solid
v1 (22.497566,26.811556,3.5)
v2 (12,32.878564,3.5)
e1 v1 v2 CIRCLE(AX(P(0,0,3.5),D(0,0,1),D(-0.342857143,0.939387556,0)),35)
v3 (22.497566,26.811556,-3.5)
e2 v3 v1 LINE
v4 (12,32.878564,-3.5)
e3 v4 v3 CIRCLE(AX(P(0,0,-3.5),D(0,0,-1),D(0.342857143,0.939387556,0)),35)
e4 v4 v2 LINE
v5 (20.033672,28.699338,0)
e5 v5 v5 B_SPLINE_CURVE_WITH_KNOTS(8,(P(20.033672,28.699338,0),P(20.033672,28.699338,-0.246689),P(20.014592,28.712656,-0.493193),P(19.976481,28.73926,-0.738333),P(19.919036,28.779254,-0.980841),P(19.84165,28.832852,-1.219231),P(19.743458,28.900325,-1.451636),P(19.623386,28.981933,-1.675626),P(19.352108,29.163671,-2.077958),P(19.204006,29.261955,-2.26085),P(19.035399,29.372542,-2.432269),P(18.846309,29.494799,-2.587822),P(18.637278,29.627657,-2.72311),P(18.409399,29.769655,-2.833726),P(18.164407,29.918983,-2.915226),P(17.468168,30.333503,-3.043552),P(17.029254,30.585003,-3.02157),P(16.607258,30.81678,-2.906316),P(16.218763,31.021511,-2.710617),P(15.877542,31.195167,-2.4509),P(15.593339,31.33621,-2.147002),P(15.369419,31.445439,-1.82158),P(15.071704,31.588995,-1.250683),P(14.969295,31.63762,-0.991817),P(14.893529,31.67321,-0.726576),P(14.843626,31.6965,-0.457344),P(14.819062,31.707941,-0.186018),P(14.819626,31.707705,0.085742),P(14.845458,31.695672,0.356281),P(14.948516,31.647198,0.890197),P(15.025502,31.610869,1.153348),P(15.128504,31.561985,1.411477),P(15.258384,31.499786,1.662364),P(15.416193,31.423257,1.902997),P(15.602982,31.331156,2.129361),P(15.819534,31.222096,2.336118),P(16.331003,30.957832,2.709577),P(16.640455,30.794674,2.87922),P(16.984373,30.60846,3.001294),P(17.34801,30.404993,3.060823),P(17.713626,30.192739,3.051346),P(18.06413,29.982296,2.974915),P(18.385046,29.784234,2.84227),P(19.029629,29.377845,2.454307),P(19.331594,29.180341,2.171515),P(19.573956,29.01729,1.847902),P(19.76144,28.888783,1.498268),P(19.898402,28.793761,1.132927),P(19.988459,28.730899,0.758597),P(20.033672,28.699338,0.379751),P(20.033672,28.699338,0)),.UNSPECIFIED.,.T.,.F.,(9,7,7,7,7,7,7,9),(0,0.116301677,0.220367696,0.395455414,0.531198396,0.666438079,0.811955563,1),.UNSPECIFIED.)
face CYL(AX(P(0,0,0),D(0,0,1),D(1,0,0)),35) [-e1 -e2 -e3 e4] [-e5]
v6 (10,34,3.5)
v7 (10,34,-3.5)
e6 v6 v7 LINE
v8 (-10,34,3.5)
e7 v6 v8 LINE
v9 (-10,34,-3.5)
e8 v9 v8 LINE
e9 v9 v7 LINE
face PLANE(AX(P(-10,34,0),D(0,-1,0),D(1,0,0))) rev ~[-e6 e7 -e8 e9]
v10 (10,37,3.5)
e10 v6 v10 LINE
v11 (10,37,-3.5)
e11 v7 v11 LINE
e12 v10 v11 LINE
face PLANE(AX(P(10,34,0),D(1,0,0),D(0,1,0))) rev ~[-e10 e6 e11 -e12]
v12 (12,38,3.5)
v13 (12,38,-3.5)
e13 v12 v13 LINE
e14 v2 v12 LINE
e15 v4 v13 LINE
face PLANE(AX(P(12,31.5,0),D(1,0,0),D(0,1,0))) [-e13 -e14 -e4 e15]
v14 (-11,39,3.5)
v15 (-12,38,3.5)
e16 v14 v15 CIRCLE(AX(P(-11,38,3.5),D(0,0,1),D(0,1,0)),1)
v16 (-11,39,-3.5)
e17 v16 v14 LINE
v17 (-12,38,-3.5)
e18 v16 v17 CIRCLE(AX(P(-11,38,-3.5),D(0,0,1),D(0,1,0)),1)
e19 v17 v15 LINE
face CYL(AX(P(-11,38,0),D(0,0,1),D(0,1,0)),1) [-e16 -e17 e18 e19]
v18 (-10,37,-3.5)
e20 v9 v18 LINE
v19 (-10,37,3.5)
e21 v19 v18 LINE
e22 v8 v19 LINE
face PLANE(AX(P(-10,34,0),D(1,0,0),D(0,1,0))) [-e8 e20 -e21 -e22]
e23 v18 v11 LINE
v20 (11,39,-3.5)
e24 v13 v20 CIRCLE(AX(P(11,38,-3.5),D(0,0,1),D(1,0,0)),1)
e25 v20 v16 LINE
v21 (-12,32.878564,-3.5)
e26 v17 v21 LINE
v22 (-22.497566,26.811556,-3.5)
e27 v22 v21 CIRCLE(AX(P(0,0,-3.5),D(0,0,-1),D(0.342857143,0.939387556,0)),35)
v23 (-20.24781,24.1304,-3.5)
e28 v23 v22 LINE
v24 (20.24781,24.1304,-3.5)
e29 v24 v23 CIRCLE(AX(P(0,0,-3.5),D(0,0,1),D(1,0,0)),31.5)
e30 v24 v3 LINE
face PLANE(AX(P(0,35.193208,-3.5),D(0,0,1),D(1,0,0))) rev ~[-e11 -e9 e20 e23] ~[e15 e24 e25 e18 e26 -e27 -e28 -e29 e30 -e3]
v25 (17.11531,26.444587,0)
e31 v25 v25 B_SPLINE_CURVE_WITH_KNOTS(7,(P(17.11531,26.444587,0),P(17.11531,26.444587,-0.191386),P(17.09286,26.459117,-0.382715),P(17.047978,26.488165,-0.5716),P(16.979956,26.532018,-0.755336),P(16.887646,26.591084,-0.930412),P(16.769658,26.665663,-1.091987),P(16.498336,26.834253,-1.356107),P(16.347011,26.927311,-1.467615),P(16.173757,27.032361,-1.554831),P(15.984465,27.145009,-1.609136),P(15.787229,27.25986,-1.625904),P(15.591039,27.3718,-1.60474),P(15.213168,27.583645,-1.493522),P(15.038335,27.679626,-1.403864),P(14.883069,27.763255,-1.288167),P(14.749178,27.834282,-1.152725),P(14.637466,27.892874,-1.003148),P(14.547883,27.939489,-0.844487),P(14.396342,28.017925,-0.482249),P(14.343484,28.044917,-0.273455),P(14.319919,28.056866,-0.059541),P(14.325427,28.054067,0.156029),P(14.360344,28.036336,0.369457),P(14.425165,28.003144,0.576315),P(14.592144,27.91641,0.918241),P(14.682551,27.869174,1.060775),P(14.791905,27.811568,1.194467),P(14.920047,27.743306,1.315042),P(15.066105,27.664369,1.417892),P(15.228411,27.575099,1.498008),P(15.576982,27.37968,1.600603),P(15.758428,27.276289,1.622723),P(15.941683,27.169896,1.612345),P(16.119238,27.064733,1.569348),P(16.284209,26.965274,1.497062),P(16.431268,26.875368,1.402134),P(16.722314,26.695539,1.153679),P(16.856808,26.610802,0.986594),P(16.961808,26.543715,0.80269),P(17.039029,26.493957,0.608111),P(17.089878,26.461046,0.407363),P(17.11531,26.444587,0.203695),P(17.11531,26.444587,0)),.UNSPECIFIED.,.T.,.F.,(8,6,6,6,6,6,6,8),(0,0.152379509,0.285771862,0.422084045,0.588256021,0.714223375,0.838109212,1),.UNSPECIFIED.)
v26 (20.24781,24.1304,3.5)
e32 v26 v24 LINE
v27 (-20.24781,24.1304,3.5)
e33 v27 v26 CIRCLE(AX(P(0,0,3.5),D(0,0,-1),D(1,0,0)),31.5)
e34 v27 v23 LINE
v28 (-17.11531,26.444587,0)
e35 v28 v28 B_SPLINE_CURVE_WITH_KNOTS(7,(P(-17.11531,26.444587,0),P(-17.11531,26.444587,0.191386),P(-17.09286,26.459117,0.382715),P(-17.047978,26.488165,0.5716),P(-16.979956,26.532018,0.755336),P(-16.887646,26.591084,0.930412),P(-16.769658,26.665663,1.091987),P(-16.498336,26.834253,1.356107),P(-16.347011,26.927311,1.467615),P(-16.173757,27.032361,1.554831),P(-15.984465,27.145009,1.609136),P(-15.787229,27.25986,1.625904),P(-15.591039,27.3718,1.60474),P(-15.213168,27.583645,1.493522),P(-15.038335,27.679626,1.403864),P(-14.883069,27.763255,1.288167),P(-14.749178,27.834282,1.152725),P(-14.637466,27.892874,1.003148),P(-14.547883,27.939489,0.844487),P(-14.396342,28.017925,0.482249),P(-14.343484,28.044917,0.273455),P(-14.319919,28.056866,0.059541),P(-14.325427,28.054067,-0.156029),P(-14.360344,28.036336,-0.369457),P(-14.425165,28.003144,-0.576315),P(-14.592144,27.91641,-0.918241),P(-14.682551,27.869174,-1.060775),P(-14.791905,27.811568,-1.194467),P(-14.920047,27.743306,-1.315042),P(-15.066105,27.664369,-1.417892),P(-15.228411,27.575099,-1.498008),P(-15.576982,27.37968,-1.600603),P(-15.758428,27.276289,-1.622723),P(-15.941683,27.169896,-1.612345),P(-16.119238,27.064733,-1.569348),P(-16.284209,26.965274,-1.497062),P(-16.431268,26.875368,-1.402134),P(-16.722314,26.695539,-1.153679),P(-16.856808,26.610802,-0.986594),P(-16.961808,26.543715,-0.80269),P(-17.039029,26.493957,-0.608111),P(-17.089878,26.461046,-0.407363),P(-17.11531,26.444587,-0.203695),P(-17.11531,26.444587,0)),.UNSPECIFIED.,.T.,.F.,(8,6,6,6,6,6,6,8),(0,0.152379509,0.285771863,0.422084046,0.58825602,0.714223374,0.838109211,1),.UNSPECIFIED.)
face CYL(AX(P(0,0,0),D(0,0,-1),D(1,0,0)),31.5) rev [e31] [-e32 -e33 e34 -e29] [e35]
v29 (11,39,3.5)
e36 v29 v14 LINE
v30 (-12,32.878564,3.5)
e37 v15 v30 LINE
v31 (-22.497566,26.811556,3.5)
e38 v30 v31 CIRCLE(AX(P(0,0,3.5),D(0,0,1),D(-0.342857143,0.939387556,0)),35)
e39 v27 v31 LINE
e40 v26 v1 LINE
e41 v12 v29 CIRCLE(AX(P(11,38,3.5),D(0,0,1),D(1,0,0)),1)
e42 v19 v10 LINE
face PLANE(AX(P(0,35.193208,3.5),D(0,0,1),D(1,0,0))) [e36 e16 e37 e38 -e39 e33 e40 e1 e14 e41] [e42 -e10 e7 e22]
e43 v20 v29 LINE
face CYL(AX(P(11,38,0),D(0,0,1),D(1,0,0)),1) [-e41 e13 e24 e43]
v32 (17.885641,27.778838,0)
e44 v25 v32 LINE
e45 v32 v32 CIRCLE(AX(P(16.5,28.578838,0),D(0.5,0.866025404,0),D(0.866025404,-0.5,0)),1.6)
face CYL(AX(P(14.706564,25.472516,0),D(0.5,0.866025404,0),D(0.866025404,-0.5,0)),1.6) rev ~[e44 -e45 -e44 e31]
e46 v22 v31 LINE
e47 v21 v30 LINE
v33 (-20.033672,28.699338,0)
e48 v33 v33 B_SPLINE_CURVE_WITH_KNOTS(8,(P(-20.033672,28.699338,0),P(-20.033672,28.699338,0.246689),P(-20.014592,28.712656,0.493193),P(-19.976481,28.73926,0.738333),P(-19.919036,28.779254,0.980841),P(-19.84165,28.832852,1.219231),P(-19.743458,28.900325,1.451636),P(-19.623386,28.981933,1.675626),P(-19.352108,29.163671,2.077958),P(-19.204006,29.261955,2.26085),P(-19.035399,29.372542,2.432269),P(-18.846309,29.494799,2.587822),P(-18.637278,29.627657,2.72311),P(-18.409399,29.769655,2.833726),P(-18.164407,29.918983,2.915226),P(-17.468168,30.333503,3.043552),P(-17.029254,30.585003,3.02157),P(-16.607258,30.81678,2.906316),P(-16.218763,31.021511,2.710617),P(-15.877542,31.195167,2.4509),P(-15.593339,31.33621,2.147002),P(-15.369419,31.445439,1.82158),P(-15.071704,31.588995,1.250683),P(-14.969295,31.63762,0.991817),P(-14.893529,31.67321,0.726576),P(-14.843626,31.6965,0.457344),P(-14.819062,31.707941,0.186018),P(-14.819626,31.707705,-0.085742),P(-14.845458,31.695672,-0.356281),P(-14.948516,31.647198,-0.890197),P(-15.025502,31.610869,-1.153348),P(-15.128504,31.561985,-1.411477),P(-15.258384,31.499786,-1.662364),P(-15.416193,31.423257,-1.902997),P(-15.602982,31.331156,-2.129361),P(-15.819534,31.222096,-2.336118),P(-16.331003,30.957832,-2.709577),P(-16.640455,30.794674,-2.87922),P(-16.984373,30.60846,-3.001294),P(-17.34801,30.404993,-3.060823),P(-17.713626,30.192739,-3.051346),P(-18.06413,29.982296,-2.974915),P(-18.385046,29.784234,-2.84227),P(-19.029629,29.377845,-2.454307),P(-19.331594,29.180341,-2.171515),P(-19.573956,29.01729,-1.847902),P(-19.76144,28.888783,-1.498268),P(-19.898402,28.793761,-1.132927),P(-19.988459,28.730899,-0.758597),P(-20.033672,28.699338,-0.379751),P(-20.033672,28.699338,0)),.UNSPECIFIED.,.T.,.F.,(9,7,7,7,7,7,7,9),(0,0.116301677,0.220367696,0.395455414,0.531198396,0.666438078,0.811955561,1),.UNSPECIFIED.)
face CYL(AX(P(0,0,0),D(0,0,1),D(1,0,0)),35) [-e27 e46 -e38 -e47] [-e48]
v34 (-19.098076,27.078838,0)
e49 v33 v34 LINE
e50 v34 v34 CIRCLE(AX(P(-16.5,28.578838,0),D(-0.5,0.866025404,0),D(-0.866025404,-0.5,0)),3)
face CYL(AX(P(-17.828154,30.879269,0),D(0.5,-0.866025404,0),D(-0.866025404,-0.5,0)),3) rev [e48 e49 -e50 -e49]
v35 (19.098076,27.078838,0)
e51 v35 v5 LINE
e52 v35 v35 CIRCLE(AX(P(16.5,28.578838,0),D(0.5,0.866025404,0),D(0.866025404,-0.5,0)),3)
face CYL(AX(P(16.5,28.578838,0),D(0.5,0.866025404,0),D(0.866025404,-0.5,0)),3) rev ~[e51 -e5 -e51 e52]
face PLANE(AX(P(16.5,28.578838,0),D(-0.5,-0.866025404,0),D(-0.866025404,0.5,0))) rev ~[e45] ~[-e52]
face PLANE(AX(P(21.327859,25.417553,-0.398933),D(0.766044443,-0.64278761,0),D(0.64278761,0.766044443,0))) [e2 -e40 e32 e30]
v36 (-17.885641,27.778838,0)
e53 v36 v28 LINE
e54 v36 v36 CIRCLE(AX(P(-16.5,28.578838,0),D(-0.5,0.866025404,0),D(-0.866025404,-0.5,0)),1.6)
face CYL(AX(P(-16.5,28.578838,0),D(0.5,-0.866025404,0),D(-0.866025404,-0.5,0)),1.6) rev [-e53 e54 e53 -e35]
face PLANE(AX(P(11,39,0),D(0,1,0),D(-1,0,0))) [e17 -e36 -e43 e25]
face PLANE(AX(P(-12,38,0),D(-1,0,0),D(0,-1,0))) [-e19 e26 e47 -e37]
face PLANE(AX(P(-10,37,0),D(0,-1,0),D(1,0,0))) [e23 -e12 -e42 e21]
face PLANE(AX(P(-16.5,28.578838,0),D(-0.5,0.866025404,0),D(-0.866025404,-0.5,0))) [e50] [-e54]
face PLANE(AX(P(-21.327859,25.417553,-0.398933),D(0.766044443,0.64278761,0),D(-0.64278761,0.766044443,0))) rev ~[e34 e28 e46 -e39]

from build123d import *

# Parameters (mm, degrees)
F0_R      = 35
F0_R_2    = 31.5
F1_DEPTH  = 3.5
F2_W      = 20
F2_H      = 3
F3_DEPTH  = 3.5
F4_DEPTH  = 12.5
F9_W      = 10.4753747582
F9_H      = 9.4332345761
F10_ANGLE = 280


# Not quite as in the source:
# - a feature names something its author has since deleted; it is built from what else it names


with BuildPart() as f1:
    # F0 (on Top) → F1 (new body, symmetric)
    with BuildSketch(Plane.XY):
        Circle(F0_R)
        Circle(F0_R_2, mode=Mode.SUBTRACT)
    extrude(amount=F1_DEPTH, both=True)

    # F2 (on Top) → F3 (join, symmetric)
    with BuildSketch(Plane.XY):
        with BuildLine():
            ThreePointArc((12, 38), (11.7071067812, 38.7071067812), (11, 39))
            Line((11, 39), (-11, 39))
            ThreePointArc((-11, 39), (-11.7071067812, 38.7071067812), (-12, 38))
            Line((-12, 38), (-12, 31.5))
            Line((-12, 31.5), (12, 31.5))
            Line((12, 31.5), (12, 38))
        make_face()
        with Locations((0, 35.5)):
            Rectangle(F2_W, F2_H, mode=Mode.SUBTRACT)
    extrude(amount=F3_DEPTH, both=True)

    # F2 (on Top) → F4 (cut, symmetric)
    with BuildSketch(Plane.XY):
        with Locations((0, 35.5)):
            Rectangle(F2_W, F2_H)
    extrude(amount=F4_DEPTH, both=True, mode=Mode.SUBTRACT)

    # F9 (on face) → F10 (revolve, cut)
    with BuildSketch(Plane(origin=(0, 0, 0), x_dir=(0.6427876097, 0.7660444431, 0), z_dir=(0.7660444431, -0.6427876097, 0))):
        with Locations((33.1802591681, -0.398933189)):
            Rectangle(F9_W, F9_H)
    revolve(axis=Axis((0, 0, 0), (0, 0, -1)), revolution_arc=F10_ANGLE, mode=Mode.SUBTRACT)

    # F5 (on Top) → F11 (revolve, cut)
    with BuildSketch(Plane.XY):
        Polygon((16.5, 28.5788383249), (17.8856406461, 27.7788383249), (19.0980762114, 27.0788383249), (20.7630293139, 29.9626216907), (18.1649531025, 31.4626216907), align=None)
        Polygon((16.0922047839, 24.6725162916), (17.8856406461, 27.7788383249), (16.5, 28.5788383249), (14.7065641379, 25.4725162916), align=None)
    revolve(axis=Axis((15.0315794057, 26.0354592487, 0), (0.5, 0.8660254038, 0)), mode=Mode.SUBTRACT)

    # F6 (on Top) → F12 (revolve, cut)
    with BuildSketch(Plane.XY):
        Polygon((-19.0980762114, 27.0788383249), (-17.8856406461, 27.7788383249), (-16.5, 28.5788383249), (-17.8281544713, 30.8792693496), (-20.4262306827, 29.3792693496), align=None)
        Polygon((-16.5, 28.5788383249), (-17.8856406461, 27.7788383249), (-16.1036535179, 24.6923460805), (-14.7180128719, 25.4923460805), align=None)
    revolve(axis=Axis((-13.6687379183, 23.6749485498, 0), (-0.5, 0.8660254038, 0)), mode=Mode.SUBTRACT)


solid = f1.part
